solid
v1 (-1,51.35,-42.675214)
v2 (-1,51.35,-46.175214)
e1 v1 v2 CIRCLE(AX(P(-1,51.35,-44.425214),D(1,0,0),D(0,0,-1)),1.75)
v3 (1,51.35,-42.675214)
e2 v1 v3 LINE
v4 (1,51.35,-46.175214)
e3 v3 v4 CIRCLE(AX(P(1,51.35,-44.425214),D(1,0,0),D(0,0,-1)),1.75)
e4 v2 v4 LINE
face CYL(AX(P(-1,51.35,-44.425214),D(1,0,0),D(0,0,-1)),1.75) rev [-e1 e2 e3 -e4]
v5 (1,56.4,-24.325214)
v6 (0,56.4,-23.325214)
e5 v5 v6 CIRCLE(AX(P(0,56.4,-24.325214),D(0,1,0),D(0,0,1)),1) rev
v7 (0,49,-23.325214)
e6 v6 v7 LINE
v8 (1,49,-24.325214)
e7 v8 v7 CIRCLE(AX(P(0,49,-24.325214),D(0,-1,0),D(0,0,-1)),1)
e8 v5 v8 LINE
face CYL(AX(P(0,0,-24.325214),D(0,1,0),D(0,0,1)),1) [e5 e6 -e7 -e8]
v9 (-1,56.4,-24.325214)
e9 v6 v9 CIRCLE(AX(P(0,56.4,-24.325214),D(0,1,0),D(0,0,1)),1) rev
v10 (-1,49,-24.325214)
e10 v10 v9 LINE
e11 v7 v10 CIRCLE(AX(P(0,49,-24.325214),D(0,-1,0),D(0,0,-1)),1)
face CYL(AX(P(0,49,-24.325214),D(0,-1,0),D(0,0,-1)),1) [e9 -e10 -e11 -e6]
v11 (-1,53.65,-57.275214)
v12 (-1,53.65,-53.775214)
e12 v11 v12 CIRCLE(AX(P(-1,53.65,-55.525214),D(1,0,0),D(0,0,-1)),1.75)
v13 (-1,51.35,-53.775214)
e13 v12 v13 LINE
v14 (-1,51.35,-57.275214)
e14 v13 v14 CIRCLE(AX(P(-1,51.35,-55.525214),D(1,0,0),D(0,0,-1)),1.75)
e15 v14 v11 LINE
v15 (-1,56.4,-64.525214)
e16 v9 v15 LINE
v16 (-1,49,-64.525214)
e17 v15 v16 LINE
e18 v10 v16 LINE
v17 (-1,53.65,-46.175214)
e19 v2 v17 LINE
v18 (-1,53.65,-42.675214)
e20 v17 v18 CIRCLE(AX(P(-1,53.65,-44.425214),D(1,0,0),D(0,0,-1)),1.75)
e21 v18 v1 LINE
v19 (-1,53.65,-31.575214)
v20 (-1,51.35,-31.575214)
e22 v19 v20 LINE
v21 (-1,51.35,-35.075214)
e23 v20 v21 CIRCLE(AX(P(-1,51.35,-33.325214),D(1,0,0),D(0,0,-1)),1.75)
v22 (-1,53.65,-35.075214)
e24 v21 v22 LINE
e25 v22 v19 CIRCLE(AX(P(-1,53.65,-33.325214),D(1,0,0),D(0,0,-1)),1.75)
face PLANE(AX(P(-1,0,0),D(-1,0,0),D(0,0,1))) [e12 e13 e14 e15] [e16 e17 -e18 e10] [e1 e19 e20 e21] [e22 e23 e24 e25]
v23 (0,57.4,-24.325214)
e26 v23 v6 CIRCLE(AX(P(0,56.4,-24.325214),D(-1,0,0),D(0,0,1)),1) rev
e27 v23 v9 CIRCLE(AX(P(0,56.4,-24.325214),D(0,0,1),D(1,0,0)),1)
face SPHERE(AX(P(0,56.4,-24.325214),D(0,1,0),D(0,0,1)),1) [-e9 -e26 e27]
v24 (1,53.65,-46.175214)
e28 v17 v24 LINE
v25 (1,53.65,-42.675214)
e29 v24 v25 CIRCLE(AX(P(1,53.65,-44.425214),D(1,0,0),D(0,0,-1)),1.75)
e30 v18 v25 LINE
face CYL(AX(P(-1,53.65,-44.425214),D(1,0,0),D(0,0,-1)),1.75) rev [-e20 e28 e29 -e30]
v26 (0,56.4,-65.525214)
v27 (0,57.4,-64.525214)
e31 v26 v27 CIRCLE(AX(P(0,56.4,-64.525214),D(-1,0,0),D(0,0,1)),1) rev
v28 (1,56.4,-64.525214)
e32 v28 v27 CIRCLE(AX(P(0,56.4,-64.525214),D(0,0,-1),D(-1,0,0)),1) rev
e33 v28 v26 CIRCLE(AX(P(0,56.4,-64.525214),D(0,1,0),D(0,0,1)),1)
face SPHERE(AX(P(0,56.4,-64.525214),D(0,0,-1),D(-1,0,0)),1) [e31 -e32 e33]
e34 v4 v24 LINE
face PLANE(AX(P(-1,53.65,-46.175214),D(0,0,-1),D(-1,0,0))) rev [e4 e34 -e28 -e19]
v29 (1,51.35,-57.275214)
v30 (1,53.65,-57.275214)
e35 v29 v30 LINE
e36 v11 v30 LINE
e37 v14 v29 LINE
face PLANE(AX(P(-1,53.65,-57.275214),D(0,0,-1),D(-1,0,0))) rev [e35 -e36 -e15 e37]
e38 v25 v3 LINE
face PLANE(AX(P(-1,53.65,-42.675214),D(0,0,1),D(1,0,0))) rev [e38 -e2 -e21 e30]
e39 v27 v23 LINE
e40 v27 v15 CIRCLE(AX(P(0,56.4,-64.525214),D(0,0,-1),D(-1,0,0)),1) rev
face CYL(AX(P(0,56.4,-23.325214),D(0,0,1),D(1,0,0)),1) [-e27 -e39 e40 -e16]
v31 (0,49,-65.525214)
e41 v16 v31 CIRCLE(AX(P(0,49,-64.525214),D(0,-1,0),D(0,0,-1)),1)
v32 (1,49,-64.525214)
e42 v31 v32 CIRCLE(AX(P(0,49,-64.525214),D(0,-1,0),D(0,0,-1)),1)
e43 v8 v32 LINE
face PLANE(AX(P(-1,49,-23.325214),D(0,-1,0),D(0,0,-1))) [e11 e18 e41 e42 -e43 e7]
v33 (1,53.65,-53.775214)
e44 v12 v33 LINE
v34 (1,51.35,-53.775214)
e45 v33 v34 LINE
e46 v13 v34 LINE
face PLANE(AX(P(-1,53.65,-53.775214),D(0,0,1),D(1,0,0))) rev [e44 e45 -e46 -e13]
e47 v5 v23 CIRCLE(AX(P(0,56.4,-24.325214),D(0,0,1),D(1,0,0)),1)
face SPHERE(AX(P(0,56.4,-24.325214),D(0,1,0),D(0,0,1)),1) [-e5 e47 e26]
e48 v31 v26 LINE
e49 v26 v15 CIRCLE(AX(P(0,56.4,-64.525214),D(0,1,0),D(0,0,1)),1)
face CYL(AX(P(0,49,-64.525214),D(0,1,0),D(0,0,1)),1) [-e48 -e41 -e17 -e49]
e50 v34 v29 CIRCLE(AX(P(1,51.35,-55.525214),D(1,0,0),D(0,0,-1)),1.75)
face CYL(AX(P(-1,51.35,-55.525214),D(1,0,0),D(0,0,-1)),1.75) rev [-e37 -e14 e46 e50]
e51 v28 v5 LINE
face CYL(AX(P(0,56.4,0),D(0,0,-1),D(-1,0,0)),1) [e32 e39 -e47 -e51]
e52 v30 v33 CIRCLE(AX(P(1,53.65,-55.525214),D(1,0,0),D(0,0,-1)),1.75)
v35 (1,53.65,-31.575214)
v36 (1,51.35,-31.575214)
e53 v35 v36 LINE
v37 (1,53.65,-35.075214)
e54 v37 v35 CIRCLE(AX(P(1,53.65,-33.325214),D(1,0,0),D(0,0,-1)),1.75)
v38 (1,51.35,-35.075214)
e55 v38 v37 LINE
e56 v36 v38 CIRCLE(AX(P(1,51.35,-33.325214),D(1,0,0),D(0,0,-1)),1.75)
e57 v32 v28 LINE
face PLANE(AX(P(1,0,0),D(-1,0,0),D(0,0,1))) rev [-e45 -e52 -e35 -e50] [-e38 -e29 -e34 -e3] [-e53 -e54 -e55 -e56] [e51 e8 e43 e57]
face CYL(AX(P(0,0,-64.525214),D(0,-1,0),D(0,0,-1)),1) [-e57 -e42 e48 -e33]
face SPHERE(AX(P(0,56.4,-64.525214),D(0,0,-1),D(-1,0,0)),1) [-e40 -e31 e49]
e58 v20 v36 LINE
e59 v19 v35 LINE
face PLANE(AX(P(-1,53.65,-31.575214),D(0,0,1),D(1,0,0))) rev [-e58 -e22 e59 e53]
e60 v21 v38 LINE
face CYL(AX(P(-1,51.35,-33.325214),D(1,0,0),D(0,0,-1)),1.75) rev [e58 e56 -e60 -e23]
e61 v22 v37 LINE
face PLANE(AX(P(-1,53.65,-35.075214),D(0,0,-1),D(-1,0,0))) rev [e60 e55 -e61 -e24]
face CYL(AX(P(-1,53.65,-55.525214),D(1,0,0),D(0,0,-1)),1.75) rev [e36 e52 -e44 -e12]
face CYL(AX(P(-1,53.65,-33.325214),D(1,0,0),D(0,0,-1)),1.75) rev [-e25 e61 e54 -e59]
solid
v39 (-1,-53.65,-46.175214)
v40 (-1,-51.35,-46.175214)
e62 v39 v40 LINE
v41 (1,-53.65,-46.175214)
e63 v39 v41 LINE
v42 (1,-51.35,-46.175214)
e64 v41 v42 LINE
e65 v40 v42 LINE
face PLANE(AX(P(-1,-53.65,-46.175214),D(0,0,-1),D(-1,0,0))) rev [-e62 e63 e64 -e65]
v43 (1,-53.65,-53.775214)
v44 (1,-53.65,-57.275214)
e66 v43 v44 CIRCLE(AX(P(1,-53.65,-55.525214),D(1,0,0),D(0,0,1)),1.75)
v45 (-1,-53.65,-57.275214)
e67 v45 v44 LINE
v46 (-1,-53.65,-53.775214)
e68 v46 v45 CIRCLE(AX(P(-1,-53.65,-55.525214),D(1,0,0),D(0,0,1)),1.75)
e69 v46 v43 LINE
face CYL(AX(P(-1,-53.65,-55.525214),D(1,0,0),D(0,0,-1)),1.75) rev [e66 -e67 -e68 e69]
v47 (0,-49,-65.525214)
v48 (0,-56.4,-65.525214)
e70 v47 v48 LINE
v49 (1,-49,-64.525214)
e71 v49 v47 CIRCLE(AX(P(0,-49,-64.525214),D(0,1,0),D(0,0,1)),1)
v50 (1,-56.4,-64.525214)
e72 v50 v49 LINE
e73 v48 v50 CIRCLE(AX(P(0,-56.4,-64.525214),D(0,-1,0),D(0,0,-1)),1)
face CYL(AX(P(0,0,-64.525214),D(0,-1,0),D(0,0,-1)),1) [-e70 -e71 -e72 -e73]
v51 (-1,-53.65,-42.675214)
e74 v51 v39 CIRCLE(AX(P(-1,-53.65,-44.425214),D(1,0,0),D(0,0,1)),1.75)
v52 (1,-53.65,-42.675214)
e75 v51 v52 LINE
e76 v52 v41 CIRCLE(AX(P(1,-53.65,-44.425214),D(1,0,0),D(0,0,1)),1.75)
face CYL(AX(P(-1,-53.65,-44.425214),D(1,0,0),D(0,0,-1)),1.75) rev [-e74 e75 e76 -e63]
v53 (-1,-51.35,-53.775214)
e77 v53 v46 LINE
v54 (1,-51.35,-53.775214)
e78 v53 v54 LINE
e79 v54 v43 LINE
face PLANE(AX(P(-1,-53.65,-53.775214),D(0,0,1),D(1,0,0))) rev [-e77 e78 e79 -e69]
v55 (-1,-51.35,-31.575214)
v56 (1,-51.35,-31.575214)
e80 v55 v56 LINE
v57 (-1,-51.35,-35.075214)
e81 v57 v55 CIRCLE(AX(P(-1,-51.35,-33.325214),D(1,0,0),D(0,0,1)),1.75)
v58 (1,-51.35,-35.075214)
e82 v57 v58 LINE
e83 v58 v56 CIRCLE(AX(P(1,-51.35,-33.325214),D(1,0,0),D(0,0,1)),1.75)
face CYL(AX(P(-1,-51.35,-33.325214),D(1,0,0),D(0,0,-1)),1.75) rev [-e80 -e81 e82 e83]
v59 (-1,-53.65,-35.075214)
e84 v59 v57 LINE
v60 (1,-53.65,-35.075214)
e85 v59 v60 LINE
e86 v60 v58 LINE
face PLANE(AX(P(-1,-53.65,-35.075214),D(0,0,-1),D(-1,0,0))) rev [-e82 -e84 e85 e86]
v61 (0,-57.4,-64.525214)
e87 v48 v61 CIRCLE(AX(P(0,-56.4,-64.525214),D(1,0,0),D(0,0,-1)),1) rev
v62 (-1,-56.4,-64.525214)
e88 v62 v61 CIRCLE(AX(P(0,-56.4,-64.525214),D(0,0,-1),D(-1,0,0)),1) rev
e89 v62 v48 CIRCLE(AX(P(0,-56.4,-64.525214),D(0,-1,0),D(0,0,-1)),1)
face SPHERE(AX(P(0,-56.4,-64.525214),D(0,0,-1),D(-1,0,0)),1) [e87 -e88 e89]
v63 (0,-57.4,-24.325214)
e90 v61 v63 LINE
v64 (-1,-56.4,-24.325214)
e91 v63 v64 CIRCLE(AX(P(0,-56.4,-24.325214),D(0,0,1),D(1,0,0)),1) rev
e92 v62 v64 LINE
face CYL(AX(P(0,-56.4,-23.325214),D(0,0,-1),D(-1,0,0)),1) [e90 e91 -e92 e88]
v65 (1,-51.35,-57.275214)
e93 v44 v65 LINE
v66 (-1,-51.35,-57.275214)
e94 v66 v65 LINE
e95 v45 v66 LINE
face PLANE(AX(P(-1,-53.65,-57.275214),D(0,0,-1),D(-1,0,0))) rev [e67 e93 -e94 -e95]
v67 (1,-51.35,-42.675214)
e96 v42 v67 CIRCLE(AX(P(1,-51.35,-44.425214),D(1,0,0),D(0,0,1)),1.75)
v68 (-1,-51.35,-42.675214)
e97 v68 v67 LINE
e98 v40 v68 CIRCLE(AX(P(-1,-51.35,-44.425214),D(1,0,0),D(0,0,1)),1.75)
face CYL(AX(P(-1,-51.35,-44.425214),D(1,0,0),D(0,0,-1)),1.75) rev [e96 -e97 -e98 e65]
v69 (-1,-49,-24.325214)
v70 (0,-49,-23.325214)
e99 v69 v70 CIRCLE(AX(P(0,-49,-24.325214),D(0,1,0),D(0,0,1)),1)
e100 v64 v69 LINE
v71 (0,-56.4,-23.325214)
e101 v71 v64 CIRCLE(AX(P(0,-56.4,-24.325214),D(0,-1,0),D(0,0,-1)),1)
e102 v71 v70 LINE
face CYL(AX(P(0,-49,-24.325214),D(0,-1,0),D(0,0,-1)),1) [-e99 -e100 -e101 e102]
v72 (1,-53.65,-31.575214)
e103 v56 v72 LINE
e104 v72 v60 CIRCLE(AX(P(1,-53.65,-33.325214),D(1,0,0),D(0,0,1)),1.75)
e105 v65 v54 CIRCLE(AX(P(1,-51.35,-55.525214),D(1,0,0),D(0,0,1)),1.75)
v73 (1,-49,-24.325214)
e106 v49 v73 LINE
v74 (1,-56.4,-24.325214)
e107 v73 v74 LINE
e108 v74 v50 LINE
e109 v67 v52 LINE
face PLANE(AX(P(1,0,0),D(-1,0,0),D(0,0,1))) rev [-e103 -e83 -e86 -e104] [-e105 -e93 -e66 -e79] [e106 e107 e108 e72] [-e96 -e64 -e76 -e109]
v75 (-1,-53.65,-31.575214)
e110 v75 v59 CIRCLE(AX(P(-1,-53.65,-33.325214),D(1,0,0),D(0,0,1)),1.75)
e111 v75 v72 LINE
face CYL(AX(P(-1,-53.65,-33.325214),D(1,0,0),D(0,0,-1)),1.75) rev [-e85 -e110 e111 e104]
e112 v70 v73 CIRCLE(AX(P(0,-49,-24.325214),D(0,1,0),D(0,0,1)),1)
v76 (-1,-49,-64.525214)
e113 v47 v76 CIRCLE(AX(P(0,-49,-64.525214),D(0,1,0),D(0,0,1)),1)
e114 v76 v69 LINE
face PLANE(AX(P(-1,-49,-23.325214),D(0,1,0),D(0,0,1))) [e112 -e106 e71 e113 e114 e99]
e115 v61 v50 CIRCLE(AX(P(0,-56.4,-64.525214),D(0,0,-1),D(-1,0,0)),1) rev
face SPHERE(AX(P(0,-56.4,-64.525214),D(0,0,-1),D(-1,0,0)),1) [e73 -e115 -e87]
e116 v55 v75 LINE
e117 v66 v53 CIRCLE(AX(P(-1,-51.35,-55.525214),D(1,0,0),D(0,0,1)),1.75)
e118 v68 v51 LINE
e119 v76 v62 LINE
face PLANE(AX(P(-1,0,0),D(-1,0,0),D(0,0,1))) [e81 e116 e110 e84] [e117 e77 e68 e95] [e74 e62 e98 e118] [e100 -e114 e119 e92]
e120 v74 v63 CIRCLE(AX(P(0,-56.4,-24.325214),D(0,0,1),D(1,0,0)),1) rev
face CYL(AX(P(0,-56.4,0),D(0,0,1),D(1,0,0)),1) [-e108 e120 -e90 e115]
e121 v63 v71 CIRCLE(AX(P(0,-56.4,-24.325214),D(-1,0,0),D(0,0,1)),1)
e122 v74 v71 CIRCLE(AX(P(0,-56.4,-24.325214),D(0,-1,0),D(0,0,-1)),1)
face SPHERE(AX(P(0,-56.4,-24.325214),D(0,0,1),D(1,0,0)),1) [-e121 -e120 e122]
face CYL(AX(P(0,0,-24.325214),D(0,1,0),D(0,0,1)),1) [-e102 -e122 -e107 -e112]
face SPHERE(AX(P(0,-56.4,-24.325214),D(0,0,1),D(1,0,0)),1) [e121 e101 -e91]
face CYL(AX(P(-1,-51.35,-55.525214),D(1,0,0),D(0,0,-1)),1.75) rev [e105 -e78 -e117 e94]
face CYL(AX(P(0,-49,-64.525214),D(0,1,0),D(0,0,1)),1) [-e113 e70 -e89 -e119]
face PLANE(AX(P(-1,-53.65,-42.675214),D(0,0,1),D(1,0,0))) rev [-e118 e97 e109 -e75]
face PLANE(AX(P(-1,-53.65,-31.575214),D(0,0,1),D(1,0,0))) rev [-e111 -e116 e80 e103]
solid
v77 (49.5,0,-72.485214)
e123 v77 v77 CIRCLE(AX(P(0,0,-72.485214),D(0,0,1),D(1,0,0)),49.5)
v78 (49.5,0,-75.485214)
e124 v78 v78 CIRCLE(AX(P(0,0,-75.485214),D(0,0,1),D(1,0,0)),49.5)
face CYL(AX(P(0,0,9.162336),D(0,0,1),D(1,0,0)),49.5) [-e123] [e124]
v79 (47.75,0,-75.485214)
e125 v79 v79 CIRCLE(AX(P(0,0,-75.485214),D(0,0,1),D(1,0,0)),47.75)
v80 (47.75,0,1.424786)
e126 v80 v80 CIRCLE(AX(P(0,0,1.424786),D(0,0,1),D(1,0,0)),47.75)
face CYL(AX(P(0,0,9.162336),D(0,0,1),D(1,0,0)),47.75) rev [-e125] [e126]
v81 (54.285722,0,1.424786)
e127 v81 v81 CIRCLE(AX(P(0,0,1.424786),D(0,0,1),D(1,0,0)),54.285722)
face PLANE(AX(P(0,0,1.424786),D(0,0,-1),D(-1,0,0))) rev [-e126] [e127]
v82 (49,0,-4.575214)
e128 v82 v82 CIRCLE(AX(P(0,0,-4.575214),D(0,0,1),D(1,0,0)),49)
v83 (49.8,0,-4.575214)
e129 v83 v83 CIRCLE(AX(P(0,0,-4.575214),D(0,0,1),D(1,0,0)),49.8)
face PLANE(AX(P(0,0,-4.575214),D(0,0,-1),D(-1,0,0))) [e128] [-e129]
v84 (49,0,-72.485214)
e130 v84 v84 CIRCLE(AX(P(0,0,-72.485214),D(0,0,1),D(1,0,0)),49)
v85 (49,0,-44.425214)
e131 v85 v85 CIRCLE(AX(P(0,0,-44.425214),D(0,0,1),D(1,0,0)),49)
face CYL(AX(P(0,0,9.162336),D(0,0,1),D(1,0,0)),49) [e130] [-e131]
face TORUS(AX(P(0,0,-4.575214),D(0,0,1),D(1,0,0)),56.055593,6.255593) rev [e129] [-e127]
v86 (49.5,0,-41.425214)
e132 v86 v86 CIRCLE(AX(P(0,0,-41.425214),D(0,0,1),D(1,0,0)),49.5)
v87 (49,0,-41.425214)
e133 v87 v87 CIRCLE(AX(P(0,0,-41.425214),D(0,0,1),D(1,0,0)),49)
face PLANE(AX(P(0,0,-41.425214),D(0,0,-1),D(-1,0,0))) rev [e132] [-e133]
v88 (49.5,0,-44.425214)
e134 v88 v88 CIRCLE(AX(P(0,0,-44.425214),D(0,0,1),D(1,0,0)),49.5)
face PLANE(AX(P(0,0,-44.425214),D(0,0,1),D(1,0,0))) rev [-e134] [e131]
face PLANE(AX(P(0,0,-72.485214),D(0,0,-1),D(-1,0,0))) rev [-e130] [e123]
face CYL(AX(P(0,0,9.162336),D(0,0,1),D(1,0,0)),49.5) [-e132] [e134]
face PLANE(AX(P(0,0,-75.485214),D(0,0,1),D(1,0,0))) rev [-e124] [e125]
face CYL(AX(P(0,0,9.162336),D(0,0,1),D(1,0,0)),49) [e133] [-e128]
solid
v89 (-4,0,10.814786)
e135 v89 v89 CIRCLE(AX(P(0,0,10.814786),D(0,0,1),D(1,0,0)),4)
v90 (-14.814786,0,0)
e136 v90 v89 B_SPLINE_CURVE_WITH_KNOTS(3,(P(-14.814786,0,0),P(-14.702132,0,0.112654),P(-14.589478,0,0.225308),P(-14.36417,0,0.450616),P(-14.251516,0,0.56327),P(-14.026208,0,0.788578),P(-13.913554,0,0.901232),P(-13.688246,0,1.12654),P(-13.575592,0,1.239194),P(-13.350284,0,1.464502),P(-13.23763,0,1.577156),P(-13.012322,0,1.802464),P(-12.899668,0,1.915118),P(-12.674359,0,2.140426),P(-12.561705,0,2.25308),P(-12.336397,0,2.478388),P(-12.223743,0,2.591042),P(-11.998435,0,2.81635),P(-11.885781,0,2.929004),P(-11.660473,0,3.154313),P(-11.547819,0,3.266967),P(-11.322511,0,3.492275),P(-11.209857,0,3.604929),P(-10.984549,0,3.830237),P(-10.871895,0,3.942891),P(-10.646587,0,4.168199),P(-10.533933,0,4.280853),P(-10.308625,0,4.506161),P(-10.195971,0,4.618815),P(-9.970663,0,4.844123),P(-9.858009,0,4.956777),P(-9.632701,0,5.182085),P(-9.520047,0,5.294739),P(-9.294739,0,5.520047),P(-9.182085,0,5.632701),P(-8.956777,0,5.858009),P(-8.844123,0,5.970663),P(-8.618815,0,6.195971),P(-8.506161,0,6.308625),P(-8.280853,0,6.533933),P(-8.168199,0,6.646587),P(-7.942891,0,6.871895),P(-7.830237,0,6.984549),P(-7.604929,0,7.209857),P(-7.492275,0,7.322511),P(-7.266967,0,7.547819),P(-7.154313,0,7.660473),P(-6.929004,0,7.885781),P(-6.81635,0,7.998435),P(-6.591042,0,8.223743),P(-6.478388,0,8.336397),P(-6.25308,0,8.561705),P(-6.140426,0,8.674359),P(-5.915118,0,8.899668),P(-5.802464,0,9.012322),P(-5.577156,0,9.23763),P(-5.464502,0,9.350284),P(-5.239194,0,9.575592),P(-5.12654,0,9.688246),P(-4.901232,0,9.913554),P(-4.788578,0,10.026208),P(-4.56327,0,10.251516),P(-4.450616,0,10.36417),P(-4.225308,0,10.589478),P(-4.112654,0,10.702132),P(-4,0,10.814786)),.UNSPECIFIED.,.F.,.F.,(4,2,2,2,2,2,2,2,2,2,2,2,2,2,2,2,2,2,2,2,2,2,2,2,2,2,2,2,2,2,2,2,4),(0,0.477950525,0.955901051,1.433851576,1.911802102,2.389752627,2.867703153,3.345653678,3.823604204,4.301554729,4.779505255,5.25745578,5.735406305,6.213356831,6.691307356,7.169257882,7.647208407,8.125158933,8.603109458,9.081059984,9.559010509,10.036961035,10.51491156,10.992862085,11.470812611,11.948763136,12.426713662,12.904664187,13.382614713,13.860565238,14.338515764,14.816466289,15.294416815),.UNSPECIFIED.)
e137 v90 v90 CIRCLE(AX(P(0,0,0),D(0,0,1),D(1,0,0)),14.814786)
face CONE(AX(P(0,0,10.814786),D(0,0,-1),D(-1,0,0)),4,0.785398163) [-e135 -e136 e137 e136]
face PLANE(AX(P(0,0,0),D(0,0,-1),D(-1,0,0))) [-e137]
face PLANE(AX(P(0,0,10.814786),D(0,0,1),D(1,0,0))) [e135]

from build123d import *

# Parameters (mm, degrees)
BOSS_EXTRUDE3_DEPTH        = 1
BOSS_EXTRUDE3_DEPTH_BACK   = 1
SKETCH2_W                  = 42.2
SKETCH2_H                  = 8.4
BOSS_EXTRUDE3_2_DEPTH      = 1
BOSS_EXTRUDE3_2_DEPTH_BACK = 1
FILLET1_R                  = 1
FILLET2_R                  = 1


with BuildPart() as part:
    # Sketch1 → Revolve1 (revolve)
    with BuildSketch(Plane(origin=(0, 0, 0), x_dir=(0, 0, -1), z_dir=(1, 0, 0)), mode=Mode.PRIVATE) as revolve1_sk:
        with BuildLine():
            Line((72.485214156, 49.5), (72.485214156, 49))
            Line((72.485214156, 49), (44.425214156, 49))
            Line((44.425214156, 49), (44.425214156, 49.5))
            Line((44.425214156, 49.5), (41.425214156, 49.5))
            Line((41.425214156, 49.5), (41.425214156, 49))
            Line((41.425214156, 49), (4.575214156, 49))
            Line((4.575214156, 49), (4.575214156, 49.8))
            ThreePointArc((4.575214156, 49.8), (0.829493213, 51.045401555), (-1.424785844, 54.285721962))
            Line((-1.424785844, 54.285721962), (-1.424785844, 49))
            Line((-1.424785844, 49), (-1.424785844, 47.75))
            Line((-1.424785844, 47.75), (75.485214156, 47.75))
            Line((75.485214156, 47.75), (75.485214156, 49))
            Line((75.485214156, 49), (75.485214156, 49.5))
            Line((75.485214156, 49.5), (72.485214156, 49.5))
        make_face()
        Polygon((0, 0), (-10.814785844, 0), (-10.814785844, 4), (0, 14.814785844), align=None)
    revolve(revolve1_sk.sketch.rotate(Axis((0, 0, 9.162335512), (0, 0, -1)), 90), axis=Axis((0, 0, 9.162335512), (0, 0, -1)))


with BuildPart() as body_2:
    # Sketch2 → Boss-Extrude3 (new, two sides: drawn at the far end of the back side and taken through both)
    with BuildSketch(Plane(origin=(0, 0, 0), x_dir=(0, 0, -1), z_dir=(1, 0, 0)).offset(-BOSS_EXTRUDE3_DEPTH_BACK)):
        with Locations((44.425214156, 53.2)):
            Rectangle(SKETCH2_W, SKETCH2_H)
        with BuildLine():
            Line((57.275214156, 53.65), (57.275214156, 51.35))
            ThreePointArc((57.275214156, 51.35), (55.525214156, 49.6), (53.775214156, 51.35))
            Line((53.775214156, 51.35), (53.775214156, 53.65))
            ThreePointArc((53.775214156, 53.65), (55.525214156, 55.4), (57.275214156, 53.65))
        make_face(mode=Mode.SUBTRACT)
        with BuildLine():
            Line((42.675214156, 53.65), (42.675214156, 51.35))
            ThreePointArc((42.675214156, 51.35), (44.425214156, 49.6), (46.175214156, 51.35))
            Line((46.175214156, 51.35), (46.175214156, 53.65))
            ThreePointArc((46.175214156, 53.65), (44.425214156, 55.4), (42.675214156, 53.65))
        make_face(mode=Mode.SUBTRACT)
        with BuildLine():
            Line((31.575214156, 53.65), (31.575214156, 51.35))
            ThreePointArc((31.575214156, 51.35), (33.325214156, 49.6), (35.075214156, 51.35))
            Line((35.075214156, 51.35), (35.075214156, 53.65))
            ThreePointArc((35.075214156, 53.65), (33.325214156, 55.4), (31.575214156, 53.65))
        make_face(mode=Mode.SUBTRACT)
    extrude(amount=BOSS_EXTRUDE3_DEPTH + BOSS_EXTRUDE3_DEPTH_BACK)

    # Fillet1
    fillet1_edges = [body_2.edges().sort_by_distance(p)[0] for p in [
        (-1, 53.2, -65.525214156),
        (-1, 57.4, -44.425214156),
        (-1, 53.2, -23.325214156),
        (1, 53.2, -23.325214156),
        (1, 53.2, -65.525214156),
        (1, 57.4, -44.425214156),
        (0, 57.4, -23.325214156),
        (0, 57.4, -65.525214156),
    ]]
    fillet(fillet1_edges, radius=FILLET1_R - 0.0001)  # a hair under: the kernel refuses the full size


with BuildPart() as body_3:
    # Sketch2 → Boss-Extrude3 2 (new, two sides: drawn at the far end of the back side and taken through both)
    with BuildSketch(Plane(origin=(0, 0, 0), x_dir=(0, 0, -1), z_dir=(1, 0, 0)).offset(-BOSS_EXTRUDE3_2_DEPTH_BACK)):
        with Locations((44.425214156, -53.2)):
            Rectangle(SKETCH2_W, SKETCH2_H)
        with BuildLine():
            Line((57.275214156, -53.65), (57.275214156, -51.35))
            ThreePointArc((57.275214156, -51.35), (55.525214156, -49.6), (53.775214156, -51.35))
            Line((53.775214156, -51.35), (53.775214156, -53.65))
            ThreePointArc((53.775214156, -53.65), (55.525214156, -55.4), (57.275214156, -53.65))
        make_face(mode=Mode.SUBTRACT)
        with BuildLine():
            Line((46.175214156, -53.65), (46.175214156, -51.35))
            ThreePointArc((46.175214156, -51.35), (44.425214156, -49.6), (42.675214156, -51.35))
            Line((42.675214156, -51.35), (42.675214156, -53.65))
            ThreePointArc((42.675214156, -53.65), (44.425214156, -55.4), (46.175214156, -53.65))
        make_face(mode=Mode.SUBTRACT)
        with BuildLine():
            Line((35.075214156, -53.65), (35.075214156, -51.35))
            ThreePointArc((35.075214156, -51.35), (33.325214156, -49.6), (31.575214156, -51.35))
            Line((31.575214156, -51.35), (31.575214156, -53.65))
            ThreePointArc((31.575214156, -53.65), (33.325214156, -55.4), (35.075214156, -53.65))
        make_face(mode=Mode.SUBTRACT)
    extrude(amount=BOSS_EXTRUDE3_2_DEPTH + BOSS_EXTRUDE3_2_DEPTH_BACK)

    # Fillet2
    fillet2_edges = [body_3.edges().sort_by_distance(p)[0] for p in [
        (1, -53.2, -23.325214156),
        (1, -57.4, -44.425214156),
        (1, -53.2, -65.525214156),
        (-1, -53.2, -23.325214156),
        (-1, -57.4, -44.425214156),
        (-1, -53.2, -65.525214156),
        (0, -57.4, -23.325214156),
        (0, -57.4, -65.525214156),
    ]]
    fillet(fillet2_edges, radius=FILLET2_R - 0.0001)  # a hair under: the kernel refuses the full size


solid = Compound([part.part, body_2.part, body_3.part])
